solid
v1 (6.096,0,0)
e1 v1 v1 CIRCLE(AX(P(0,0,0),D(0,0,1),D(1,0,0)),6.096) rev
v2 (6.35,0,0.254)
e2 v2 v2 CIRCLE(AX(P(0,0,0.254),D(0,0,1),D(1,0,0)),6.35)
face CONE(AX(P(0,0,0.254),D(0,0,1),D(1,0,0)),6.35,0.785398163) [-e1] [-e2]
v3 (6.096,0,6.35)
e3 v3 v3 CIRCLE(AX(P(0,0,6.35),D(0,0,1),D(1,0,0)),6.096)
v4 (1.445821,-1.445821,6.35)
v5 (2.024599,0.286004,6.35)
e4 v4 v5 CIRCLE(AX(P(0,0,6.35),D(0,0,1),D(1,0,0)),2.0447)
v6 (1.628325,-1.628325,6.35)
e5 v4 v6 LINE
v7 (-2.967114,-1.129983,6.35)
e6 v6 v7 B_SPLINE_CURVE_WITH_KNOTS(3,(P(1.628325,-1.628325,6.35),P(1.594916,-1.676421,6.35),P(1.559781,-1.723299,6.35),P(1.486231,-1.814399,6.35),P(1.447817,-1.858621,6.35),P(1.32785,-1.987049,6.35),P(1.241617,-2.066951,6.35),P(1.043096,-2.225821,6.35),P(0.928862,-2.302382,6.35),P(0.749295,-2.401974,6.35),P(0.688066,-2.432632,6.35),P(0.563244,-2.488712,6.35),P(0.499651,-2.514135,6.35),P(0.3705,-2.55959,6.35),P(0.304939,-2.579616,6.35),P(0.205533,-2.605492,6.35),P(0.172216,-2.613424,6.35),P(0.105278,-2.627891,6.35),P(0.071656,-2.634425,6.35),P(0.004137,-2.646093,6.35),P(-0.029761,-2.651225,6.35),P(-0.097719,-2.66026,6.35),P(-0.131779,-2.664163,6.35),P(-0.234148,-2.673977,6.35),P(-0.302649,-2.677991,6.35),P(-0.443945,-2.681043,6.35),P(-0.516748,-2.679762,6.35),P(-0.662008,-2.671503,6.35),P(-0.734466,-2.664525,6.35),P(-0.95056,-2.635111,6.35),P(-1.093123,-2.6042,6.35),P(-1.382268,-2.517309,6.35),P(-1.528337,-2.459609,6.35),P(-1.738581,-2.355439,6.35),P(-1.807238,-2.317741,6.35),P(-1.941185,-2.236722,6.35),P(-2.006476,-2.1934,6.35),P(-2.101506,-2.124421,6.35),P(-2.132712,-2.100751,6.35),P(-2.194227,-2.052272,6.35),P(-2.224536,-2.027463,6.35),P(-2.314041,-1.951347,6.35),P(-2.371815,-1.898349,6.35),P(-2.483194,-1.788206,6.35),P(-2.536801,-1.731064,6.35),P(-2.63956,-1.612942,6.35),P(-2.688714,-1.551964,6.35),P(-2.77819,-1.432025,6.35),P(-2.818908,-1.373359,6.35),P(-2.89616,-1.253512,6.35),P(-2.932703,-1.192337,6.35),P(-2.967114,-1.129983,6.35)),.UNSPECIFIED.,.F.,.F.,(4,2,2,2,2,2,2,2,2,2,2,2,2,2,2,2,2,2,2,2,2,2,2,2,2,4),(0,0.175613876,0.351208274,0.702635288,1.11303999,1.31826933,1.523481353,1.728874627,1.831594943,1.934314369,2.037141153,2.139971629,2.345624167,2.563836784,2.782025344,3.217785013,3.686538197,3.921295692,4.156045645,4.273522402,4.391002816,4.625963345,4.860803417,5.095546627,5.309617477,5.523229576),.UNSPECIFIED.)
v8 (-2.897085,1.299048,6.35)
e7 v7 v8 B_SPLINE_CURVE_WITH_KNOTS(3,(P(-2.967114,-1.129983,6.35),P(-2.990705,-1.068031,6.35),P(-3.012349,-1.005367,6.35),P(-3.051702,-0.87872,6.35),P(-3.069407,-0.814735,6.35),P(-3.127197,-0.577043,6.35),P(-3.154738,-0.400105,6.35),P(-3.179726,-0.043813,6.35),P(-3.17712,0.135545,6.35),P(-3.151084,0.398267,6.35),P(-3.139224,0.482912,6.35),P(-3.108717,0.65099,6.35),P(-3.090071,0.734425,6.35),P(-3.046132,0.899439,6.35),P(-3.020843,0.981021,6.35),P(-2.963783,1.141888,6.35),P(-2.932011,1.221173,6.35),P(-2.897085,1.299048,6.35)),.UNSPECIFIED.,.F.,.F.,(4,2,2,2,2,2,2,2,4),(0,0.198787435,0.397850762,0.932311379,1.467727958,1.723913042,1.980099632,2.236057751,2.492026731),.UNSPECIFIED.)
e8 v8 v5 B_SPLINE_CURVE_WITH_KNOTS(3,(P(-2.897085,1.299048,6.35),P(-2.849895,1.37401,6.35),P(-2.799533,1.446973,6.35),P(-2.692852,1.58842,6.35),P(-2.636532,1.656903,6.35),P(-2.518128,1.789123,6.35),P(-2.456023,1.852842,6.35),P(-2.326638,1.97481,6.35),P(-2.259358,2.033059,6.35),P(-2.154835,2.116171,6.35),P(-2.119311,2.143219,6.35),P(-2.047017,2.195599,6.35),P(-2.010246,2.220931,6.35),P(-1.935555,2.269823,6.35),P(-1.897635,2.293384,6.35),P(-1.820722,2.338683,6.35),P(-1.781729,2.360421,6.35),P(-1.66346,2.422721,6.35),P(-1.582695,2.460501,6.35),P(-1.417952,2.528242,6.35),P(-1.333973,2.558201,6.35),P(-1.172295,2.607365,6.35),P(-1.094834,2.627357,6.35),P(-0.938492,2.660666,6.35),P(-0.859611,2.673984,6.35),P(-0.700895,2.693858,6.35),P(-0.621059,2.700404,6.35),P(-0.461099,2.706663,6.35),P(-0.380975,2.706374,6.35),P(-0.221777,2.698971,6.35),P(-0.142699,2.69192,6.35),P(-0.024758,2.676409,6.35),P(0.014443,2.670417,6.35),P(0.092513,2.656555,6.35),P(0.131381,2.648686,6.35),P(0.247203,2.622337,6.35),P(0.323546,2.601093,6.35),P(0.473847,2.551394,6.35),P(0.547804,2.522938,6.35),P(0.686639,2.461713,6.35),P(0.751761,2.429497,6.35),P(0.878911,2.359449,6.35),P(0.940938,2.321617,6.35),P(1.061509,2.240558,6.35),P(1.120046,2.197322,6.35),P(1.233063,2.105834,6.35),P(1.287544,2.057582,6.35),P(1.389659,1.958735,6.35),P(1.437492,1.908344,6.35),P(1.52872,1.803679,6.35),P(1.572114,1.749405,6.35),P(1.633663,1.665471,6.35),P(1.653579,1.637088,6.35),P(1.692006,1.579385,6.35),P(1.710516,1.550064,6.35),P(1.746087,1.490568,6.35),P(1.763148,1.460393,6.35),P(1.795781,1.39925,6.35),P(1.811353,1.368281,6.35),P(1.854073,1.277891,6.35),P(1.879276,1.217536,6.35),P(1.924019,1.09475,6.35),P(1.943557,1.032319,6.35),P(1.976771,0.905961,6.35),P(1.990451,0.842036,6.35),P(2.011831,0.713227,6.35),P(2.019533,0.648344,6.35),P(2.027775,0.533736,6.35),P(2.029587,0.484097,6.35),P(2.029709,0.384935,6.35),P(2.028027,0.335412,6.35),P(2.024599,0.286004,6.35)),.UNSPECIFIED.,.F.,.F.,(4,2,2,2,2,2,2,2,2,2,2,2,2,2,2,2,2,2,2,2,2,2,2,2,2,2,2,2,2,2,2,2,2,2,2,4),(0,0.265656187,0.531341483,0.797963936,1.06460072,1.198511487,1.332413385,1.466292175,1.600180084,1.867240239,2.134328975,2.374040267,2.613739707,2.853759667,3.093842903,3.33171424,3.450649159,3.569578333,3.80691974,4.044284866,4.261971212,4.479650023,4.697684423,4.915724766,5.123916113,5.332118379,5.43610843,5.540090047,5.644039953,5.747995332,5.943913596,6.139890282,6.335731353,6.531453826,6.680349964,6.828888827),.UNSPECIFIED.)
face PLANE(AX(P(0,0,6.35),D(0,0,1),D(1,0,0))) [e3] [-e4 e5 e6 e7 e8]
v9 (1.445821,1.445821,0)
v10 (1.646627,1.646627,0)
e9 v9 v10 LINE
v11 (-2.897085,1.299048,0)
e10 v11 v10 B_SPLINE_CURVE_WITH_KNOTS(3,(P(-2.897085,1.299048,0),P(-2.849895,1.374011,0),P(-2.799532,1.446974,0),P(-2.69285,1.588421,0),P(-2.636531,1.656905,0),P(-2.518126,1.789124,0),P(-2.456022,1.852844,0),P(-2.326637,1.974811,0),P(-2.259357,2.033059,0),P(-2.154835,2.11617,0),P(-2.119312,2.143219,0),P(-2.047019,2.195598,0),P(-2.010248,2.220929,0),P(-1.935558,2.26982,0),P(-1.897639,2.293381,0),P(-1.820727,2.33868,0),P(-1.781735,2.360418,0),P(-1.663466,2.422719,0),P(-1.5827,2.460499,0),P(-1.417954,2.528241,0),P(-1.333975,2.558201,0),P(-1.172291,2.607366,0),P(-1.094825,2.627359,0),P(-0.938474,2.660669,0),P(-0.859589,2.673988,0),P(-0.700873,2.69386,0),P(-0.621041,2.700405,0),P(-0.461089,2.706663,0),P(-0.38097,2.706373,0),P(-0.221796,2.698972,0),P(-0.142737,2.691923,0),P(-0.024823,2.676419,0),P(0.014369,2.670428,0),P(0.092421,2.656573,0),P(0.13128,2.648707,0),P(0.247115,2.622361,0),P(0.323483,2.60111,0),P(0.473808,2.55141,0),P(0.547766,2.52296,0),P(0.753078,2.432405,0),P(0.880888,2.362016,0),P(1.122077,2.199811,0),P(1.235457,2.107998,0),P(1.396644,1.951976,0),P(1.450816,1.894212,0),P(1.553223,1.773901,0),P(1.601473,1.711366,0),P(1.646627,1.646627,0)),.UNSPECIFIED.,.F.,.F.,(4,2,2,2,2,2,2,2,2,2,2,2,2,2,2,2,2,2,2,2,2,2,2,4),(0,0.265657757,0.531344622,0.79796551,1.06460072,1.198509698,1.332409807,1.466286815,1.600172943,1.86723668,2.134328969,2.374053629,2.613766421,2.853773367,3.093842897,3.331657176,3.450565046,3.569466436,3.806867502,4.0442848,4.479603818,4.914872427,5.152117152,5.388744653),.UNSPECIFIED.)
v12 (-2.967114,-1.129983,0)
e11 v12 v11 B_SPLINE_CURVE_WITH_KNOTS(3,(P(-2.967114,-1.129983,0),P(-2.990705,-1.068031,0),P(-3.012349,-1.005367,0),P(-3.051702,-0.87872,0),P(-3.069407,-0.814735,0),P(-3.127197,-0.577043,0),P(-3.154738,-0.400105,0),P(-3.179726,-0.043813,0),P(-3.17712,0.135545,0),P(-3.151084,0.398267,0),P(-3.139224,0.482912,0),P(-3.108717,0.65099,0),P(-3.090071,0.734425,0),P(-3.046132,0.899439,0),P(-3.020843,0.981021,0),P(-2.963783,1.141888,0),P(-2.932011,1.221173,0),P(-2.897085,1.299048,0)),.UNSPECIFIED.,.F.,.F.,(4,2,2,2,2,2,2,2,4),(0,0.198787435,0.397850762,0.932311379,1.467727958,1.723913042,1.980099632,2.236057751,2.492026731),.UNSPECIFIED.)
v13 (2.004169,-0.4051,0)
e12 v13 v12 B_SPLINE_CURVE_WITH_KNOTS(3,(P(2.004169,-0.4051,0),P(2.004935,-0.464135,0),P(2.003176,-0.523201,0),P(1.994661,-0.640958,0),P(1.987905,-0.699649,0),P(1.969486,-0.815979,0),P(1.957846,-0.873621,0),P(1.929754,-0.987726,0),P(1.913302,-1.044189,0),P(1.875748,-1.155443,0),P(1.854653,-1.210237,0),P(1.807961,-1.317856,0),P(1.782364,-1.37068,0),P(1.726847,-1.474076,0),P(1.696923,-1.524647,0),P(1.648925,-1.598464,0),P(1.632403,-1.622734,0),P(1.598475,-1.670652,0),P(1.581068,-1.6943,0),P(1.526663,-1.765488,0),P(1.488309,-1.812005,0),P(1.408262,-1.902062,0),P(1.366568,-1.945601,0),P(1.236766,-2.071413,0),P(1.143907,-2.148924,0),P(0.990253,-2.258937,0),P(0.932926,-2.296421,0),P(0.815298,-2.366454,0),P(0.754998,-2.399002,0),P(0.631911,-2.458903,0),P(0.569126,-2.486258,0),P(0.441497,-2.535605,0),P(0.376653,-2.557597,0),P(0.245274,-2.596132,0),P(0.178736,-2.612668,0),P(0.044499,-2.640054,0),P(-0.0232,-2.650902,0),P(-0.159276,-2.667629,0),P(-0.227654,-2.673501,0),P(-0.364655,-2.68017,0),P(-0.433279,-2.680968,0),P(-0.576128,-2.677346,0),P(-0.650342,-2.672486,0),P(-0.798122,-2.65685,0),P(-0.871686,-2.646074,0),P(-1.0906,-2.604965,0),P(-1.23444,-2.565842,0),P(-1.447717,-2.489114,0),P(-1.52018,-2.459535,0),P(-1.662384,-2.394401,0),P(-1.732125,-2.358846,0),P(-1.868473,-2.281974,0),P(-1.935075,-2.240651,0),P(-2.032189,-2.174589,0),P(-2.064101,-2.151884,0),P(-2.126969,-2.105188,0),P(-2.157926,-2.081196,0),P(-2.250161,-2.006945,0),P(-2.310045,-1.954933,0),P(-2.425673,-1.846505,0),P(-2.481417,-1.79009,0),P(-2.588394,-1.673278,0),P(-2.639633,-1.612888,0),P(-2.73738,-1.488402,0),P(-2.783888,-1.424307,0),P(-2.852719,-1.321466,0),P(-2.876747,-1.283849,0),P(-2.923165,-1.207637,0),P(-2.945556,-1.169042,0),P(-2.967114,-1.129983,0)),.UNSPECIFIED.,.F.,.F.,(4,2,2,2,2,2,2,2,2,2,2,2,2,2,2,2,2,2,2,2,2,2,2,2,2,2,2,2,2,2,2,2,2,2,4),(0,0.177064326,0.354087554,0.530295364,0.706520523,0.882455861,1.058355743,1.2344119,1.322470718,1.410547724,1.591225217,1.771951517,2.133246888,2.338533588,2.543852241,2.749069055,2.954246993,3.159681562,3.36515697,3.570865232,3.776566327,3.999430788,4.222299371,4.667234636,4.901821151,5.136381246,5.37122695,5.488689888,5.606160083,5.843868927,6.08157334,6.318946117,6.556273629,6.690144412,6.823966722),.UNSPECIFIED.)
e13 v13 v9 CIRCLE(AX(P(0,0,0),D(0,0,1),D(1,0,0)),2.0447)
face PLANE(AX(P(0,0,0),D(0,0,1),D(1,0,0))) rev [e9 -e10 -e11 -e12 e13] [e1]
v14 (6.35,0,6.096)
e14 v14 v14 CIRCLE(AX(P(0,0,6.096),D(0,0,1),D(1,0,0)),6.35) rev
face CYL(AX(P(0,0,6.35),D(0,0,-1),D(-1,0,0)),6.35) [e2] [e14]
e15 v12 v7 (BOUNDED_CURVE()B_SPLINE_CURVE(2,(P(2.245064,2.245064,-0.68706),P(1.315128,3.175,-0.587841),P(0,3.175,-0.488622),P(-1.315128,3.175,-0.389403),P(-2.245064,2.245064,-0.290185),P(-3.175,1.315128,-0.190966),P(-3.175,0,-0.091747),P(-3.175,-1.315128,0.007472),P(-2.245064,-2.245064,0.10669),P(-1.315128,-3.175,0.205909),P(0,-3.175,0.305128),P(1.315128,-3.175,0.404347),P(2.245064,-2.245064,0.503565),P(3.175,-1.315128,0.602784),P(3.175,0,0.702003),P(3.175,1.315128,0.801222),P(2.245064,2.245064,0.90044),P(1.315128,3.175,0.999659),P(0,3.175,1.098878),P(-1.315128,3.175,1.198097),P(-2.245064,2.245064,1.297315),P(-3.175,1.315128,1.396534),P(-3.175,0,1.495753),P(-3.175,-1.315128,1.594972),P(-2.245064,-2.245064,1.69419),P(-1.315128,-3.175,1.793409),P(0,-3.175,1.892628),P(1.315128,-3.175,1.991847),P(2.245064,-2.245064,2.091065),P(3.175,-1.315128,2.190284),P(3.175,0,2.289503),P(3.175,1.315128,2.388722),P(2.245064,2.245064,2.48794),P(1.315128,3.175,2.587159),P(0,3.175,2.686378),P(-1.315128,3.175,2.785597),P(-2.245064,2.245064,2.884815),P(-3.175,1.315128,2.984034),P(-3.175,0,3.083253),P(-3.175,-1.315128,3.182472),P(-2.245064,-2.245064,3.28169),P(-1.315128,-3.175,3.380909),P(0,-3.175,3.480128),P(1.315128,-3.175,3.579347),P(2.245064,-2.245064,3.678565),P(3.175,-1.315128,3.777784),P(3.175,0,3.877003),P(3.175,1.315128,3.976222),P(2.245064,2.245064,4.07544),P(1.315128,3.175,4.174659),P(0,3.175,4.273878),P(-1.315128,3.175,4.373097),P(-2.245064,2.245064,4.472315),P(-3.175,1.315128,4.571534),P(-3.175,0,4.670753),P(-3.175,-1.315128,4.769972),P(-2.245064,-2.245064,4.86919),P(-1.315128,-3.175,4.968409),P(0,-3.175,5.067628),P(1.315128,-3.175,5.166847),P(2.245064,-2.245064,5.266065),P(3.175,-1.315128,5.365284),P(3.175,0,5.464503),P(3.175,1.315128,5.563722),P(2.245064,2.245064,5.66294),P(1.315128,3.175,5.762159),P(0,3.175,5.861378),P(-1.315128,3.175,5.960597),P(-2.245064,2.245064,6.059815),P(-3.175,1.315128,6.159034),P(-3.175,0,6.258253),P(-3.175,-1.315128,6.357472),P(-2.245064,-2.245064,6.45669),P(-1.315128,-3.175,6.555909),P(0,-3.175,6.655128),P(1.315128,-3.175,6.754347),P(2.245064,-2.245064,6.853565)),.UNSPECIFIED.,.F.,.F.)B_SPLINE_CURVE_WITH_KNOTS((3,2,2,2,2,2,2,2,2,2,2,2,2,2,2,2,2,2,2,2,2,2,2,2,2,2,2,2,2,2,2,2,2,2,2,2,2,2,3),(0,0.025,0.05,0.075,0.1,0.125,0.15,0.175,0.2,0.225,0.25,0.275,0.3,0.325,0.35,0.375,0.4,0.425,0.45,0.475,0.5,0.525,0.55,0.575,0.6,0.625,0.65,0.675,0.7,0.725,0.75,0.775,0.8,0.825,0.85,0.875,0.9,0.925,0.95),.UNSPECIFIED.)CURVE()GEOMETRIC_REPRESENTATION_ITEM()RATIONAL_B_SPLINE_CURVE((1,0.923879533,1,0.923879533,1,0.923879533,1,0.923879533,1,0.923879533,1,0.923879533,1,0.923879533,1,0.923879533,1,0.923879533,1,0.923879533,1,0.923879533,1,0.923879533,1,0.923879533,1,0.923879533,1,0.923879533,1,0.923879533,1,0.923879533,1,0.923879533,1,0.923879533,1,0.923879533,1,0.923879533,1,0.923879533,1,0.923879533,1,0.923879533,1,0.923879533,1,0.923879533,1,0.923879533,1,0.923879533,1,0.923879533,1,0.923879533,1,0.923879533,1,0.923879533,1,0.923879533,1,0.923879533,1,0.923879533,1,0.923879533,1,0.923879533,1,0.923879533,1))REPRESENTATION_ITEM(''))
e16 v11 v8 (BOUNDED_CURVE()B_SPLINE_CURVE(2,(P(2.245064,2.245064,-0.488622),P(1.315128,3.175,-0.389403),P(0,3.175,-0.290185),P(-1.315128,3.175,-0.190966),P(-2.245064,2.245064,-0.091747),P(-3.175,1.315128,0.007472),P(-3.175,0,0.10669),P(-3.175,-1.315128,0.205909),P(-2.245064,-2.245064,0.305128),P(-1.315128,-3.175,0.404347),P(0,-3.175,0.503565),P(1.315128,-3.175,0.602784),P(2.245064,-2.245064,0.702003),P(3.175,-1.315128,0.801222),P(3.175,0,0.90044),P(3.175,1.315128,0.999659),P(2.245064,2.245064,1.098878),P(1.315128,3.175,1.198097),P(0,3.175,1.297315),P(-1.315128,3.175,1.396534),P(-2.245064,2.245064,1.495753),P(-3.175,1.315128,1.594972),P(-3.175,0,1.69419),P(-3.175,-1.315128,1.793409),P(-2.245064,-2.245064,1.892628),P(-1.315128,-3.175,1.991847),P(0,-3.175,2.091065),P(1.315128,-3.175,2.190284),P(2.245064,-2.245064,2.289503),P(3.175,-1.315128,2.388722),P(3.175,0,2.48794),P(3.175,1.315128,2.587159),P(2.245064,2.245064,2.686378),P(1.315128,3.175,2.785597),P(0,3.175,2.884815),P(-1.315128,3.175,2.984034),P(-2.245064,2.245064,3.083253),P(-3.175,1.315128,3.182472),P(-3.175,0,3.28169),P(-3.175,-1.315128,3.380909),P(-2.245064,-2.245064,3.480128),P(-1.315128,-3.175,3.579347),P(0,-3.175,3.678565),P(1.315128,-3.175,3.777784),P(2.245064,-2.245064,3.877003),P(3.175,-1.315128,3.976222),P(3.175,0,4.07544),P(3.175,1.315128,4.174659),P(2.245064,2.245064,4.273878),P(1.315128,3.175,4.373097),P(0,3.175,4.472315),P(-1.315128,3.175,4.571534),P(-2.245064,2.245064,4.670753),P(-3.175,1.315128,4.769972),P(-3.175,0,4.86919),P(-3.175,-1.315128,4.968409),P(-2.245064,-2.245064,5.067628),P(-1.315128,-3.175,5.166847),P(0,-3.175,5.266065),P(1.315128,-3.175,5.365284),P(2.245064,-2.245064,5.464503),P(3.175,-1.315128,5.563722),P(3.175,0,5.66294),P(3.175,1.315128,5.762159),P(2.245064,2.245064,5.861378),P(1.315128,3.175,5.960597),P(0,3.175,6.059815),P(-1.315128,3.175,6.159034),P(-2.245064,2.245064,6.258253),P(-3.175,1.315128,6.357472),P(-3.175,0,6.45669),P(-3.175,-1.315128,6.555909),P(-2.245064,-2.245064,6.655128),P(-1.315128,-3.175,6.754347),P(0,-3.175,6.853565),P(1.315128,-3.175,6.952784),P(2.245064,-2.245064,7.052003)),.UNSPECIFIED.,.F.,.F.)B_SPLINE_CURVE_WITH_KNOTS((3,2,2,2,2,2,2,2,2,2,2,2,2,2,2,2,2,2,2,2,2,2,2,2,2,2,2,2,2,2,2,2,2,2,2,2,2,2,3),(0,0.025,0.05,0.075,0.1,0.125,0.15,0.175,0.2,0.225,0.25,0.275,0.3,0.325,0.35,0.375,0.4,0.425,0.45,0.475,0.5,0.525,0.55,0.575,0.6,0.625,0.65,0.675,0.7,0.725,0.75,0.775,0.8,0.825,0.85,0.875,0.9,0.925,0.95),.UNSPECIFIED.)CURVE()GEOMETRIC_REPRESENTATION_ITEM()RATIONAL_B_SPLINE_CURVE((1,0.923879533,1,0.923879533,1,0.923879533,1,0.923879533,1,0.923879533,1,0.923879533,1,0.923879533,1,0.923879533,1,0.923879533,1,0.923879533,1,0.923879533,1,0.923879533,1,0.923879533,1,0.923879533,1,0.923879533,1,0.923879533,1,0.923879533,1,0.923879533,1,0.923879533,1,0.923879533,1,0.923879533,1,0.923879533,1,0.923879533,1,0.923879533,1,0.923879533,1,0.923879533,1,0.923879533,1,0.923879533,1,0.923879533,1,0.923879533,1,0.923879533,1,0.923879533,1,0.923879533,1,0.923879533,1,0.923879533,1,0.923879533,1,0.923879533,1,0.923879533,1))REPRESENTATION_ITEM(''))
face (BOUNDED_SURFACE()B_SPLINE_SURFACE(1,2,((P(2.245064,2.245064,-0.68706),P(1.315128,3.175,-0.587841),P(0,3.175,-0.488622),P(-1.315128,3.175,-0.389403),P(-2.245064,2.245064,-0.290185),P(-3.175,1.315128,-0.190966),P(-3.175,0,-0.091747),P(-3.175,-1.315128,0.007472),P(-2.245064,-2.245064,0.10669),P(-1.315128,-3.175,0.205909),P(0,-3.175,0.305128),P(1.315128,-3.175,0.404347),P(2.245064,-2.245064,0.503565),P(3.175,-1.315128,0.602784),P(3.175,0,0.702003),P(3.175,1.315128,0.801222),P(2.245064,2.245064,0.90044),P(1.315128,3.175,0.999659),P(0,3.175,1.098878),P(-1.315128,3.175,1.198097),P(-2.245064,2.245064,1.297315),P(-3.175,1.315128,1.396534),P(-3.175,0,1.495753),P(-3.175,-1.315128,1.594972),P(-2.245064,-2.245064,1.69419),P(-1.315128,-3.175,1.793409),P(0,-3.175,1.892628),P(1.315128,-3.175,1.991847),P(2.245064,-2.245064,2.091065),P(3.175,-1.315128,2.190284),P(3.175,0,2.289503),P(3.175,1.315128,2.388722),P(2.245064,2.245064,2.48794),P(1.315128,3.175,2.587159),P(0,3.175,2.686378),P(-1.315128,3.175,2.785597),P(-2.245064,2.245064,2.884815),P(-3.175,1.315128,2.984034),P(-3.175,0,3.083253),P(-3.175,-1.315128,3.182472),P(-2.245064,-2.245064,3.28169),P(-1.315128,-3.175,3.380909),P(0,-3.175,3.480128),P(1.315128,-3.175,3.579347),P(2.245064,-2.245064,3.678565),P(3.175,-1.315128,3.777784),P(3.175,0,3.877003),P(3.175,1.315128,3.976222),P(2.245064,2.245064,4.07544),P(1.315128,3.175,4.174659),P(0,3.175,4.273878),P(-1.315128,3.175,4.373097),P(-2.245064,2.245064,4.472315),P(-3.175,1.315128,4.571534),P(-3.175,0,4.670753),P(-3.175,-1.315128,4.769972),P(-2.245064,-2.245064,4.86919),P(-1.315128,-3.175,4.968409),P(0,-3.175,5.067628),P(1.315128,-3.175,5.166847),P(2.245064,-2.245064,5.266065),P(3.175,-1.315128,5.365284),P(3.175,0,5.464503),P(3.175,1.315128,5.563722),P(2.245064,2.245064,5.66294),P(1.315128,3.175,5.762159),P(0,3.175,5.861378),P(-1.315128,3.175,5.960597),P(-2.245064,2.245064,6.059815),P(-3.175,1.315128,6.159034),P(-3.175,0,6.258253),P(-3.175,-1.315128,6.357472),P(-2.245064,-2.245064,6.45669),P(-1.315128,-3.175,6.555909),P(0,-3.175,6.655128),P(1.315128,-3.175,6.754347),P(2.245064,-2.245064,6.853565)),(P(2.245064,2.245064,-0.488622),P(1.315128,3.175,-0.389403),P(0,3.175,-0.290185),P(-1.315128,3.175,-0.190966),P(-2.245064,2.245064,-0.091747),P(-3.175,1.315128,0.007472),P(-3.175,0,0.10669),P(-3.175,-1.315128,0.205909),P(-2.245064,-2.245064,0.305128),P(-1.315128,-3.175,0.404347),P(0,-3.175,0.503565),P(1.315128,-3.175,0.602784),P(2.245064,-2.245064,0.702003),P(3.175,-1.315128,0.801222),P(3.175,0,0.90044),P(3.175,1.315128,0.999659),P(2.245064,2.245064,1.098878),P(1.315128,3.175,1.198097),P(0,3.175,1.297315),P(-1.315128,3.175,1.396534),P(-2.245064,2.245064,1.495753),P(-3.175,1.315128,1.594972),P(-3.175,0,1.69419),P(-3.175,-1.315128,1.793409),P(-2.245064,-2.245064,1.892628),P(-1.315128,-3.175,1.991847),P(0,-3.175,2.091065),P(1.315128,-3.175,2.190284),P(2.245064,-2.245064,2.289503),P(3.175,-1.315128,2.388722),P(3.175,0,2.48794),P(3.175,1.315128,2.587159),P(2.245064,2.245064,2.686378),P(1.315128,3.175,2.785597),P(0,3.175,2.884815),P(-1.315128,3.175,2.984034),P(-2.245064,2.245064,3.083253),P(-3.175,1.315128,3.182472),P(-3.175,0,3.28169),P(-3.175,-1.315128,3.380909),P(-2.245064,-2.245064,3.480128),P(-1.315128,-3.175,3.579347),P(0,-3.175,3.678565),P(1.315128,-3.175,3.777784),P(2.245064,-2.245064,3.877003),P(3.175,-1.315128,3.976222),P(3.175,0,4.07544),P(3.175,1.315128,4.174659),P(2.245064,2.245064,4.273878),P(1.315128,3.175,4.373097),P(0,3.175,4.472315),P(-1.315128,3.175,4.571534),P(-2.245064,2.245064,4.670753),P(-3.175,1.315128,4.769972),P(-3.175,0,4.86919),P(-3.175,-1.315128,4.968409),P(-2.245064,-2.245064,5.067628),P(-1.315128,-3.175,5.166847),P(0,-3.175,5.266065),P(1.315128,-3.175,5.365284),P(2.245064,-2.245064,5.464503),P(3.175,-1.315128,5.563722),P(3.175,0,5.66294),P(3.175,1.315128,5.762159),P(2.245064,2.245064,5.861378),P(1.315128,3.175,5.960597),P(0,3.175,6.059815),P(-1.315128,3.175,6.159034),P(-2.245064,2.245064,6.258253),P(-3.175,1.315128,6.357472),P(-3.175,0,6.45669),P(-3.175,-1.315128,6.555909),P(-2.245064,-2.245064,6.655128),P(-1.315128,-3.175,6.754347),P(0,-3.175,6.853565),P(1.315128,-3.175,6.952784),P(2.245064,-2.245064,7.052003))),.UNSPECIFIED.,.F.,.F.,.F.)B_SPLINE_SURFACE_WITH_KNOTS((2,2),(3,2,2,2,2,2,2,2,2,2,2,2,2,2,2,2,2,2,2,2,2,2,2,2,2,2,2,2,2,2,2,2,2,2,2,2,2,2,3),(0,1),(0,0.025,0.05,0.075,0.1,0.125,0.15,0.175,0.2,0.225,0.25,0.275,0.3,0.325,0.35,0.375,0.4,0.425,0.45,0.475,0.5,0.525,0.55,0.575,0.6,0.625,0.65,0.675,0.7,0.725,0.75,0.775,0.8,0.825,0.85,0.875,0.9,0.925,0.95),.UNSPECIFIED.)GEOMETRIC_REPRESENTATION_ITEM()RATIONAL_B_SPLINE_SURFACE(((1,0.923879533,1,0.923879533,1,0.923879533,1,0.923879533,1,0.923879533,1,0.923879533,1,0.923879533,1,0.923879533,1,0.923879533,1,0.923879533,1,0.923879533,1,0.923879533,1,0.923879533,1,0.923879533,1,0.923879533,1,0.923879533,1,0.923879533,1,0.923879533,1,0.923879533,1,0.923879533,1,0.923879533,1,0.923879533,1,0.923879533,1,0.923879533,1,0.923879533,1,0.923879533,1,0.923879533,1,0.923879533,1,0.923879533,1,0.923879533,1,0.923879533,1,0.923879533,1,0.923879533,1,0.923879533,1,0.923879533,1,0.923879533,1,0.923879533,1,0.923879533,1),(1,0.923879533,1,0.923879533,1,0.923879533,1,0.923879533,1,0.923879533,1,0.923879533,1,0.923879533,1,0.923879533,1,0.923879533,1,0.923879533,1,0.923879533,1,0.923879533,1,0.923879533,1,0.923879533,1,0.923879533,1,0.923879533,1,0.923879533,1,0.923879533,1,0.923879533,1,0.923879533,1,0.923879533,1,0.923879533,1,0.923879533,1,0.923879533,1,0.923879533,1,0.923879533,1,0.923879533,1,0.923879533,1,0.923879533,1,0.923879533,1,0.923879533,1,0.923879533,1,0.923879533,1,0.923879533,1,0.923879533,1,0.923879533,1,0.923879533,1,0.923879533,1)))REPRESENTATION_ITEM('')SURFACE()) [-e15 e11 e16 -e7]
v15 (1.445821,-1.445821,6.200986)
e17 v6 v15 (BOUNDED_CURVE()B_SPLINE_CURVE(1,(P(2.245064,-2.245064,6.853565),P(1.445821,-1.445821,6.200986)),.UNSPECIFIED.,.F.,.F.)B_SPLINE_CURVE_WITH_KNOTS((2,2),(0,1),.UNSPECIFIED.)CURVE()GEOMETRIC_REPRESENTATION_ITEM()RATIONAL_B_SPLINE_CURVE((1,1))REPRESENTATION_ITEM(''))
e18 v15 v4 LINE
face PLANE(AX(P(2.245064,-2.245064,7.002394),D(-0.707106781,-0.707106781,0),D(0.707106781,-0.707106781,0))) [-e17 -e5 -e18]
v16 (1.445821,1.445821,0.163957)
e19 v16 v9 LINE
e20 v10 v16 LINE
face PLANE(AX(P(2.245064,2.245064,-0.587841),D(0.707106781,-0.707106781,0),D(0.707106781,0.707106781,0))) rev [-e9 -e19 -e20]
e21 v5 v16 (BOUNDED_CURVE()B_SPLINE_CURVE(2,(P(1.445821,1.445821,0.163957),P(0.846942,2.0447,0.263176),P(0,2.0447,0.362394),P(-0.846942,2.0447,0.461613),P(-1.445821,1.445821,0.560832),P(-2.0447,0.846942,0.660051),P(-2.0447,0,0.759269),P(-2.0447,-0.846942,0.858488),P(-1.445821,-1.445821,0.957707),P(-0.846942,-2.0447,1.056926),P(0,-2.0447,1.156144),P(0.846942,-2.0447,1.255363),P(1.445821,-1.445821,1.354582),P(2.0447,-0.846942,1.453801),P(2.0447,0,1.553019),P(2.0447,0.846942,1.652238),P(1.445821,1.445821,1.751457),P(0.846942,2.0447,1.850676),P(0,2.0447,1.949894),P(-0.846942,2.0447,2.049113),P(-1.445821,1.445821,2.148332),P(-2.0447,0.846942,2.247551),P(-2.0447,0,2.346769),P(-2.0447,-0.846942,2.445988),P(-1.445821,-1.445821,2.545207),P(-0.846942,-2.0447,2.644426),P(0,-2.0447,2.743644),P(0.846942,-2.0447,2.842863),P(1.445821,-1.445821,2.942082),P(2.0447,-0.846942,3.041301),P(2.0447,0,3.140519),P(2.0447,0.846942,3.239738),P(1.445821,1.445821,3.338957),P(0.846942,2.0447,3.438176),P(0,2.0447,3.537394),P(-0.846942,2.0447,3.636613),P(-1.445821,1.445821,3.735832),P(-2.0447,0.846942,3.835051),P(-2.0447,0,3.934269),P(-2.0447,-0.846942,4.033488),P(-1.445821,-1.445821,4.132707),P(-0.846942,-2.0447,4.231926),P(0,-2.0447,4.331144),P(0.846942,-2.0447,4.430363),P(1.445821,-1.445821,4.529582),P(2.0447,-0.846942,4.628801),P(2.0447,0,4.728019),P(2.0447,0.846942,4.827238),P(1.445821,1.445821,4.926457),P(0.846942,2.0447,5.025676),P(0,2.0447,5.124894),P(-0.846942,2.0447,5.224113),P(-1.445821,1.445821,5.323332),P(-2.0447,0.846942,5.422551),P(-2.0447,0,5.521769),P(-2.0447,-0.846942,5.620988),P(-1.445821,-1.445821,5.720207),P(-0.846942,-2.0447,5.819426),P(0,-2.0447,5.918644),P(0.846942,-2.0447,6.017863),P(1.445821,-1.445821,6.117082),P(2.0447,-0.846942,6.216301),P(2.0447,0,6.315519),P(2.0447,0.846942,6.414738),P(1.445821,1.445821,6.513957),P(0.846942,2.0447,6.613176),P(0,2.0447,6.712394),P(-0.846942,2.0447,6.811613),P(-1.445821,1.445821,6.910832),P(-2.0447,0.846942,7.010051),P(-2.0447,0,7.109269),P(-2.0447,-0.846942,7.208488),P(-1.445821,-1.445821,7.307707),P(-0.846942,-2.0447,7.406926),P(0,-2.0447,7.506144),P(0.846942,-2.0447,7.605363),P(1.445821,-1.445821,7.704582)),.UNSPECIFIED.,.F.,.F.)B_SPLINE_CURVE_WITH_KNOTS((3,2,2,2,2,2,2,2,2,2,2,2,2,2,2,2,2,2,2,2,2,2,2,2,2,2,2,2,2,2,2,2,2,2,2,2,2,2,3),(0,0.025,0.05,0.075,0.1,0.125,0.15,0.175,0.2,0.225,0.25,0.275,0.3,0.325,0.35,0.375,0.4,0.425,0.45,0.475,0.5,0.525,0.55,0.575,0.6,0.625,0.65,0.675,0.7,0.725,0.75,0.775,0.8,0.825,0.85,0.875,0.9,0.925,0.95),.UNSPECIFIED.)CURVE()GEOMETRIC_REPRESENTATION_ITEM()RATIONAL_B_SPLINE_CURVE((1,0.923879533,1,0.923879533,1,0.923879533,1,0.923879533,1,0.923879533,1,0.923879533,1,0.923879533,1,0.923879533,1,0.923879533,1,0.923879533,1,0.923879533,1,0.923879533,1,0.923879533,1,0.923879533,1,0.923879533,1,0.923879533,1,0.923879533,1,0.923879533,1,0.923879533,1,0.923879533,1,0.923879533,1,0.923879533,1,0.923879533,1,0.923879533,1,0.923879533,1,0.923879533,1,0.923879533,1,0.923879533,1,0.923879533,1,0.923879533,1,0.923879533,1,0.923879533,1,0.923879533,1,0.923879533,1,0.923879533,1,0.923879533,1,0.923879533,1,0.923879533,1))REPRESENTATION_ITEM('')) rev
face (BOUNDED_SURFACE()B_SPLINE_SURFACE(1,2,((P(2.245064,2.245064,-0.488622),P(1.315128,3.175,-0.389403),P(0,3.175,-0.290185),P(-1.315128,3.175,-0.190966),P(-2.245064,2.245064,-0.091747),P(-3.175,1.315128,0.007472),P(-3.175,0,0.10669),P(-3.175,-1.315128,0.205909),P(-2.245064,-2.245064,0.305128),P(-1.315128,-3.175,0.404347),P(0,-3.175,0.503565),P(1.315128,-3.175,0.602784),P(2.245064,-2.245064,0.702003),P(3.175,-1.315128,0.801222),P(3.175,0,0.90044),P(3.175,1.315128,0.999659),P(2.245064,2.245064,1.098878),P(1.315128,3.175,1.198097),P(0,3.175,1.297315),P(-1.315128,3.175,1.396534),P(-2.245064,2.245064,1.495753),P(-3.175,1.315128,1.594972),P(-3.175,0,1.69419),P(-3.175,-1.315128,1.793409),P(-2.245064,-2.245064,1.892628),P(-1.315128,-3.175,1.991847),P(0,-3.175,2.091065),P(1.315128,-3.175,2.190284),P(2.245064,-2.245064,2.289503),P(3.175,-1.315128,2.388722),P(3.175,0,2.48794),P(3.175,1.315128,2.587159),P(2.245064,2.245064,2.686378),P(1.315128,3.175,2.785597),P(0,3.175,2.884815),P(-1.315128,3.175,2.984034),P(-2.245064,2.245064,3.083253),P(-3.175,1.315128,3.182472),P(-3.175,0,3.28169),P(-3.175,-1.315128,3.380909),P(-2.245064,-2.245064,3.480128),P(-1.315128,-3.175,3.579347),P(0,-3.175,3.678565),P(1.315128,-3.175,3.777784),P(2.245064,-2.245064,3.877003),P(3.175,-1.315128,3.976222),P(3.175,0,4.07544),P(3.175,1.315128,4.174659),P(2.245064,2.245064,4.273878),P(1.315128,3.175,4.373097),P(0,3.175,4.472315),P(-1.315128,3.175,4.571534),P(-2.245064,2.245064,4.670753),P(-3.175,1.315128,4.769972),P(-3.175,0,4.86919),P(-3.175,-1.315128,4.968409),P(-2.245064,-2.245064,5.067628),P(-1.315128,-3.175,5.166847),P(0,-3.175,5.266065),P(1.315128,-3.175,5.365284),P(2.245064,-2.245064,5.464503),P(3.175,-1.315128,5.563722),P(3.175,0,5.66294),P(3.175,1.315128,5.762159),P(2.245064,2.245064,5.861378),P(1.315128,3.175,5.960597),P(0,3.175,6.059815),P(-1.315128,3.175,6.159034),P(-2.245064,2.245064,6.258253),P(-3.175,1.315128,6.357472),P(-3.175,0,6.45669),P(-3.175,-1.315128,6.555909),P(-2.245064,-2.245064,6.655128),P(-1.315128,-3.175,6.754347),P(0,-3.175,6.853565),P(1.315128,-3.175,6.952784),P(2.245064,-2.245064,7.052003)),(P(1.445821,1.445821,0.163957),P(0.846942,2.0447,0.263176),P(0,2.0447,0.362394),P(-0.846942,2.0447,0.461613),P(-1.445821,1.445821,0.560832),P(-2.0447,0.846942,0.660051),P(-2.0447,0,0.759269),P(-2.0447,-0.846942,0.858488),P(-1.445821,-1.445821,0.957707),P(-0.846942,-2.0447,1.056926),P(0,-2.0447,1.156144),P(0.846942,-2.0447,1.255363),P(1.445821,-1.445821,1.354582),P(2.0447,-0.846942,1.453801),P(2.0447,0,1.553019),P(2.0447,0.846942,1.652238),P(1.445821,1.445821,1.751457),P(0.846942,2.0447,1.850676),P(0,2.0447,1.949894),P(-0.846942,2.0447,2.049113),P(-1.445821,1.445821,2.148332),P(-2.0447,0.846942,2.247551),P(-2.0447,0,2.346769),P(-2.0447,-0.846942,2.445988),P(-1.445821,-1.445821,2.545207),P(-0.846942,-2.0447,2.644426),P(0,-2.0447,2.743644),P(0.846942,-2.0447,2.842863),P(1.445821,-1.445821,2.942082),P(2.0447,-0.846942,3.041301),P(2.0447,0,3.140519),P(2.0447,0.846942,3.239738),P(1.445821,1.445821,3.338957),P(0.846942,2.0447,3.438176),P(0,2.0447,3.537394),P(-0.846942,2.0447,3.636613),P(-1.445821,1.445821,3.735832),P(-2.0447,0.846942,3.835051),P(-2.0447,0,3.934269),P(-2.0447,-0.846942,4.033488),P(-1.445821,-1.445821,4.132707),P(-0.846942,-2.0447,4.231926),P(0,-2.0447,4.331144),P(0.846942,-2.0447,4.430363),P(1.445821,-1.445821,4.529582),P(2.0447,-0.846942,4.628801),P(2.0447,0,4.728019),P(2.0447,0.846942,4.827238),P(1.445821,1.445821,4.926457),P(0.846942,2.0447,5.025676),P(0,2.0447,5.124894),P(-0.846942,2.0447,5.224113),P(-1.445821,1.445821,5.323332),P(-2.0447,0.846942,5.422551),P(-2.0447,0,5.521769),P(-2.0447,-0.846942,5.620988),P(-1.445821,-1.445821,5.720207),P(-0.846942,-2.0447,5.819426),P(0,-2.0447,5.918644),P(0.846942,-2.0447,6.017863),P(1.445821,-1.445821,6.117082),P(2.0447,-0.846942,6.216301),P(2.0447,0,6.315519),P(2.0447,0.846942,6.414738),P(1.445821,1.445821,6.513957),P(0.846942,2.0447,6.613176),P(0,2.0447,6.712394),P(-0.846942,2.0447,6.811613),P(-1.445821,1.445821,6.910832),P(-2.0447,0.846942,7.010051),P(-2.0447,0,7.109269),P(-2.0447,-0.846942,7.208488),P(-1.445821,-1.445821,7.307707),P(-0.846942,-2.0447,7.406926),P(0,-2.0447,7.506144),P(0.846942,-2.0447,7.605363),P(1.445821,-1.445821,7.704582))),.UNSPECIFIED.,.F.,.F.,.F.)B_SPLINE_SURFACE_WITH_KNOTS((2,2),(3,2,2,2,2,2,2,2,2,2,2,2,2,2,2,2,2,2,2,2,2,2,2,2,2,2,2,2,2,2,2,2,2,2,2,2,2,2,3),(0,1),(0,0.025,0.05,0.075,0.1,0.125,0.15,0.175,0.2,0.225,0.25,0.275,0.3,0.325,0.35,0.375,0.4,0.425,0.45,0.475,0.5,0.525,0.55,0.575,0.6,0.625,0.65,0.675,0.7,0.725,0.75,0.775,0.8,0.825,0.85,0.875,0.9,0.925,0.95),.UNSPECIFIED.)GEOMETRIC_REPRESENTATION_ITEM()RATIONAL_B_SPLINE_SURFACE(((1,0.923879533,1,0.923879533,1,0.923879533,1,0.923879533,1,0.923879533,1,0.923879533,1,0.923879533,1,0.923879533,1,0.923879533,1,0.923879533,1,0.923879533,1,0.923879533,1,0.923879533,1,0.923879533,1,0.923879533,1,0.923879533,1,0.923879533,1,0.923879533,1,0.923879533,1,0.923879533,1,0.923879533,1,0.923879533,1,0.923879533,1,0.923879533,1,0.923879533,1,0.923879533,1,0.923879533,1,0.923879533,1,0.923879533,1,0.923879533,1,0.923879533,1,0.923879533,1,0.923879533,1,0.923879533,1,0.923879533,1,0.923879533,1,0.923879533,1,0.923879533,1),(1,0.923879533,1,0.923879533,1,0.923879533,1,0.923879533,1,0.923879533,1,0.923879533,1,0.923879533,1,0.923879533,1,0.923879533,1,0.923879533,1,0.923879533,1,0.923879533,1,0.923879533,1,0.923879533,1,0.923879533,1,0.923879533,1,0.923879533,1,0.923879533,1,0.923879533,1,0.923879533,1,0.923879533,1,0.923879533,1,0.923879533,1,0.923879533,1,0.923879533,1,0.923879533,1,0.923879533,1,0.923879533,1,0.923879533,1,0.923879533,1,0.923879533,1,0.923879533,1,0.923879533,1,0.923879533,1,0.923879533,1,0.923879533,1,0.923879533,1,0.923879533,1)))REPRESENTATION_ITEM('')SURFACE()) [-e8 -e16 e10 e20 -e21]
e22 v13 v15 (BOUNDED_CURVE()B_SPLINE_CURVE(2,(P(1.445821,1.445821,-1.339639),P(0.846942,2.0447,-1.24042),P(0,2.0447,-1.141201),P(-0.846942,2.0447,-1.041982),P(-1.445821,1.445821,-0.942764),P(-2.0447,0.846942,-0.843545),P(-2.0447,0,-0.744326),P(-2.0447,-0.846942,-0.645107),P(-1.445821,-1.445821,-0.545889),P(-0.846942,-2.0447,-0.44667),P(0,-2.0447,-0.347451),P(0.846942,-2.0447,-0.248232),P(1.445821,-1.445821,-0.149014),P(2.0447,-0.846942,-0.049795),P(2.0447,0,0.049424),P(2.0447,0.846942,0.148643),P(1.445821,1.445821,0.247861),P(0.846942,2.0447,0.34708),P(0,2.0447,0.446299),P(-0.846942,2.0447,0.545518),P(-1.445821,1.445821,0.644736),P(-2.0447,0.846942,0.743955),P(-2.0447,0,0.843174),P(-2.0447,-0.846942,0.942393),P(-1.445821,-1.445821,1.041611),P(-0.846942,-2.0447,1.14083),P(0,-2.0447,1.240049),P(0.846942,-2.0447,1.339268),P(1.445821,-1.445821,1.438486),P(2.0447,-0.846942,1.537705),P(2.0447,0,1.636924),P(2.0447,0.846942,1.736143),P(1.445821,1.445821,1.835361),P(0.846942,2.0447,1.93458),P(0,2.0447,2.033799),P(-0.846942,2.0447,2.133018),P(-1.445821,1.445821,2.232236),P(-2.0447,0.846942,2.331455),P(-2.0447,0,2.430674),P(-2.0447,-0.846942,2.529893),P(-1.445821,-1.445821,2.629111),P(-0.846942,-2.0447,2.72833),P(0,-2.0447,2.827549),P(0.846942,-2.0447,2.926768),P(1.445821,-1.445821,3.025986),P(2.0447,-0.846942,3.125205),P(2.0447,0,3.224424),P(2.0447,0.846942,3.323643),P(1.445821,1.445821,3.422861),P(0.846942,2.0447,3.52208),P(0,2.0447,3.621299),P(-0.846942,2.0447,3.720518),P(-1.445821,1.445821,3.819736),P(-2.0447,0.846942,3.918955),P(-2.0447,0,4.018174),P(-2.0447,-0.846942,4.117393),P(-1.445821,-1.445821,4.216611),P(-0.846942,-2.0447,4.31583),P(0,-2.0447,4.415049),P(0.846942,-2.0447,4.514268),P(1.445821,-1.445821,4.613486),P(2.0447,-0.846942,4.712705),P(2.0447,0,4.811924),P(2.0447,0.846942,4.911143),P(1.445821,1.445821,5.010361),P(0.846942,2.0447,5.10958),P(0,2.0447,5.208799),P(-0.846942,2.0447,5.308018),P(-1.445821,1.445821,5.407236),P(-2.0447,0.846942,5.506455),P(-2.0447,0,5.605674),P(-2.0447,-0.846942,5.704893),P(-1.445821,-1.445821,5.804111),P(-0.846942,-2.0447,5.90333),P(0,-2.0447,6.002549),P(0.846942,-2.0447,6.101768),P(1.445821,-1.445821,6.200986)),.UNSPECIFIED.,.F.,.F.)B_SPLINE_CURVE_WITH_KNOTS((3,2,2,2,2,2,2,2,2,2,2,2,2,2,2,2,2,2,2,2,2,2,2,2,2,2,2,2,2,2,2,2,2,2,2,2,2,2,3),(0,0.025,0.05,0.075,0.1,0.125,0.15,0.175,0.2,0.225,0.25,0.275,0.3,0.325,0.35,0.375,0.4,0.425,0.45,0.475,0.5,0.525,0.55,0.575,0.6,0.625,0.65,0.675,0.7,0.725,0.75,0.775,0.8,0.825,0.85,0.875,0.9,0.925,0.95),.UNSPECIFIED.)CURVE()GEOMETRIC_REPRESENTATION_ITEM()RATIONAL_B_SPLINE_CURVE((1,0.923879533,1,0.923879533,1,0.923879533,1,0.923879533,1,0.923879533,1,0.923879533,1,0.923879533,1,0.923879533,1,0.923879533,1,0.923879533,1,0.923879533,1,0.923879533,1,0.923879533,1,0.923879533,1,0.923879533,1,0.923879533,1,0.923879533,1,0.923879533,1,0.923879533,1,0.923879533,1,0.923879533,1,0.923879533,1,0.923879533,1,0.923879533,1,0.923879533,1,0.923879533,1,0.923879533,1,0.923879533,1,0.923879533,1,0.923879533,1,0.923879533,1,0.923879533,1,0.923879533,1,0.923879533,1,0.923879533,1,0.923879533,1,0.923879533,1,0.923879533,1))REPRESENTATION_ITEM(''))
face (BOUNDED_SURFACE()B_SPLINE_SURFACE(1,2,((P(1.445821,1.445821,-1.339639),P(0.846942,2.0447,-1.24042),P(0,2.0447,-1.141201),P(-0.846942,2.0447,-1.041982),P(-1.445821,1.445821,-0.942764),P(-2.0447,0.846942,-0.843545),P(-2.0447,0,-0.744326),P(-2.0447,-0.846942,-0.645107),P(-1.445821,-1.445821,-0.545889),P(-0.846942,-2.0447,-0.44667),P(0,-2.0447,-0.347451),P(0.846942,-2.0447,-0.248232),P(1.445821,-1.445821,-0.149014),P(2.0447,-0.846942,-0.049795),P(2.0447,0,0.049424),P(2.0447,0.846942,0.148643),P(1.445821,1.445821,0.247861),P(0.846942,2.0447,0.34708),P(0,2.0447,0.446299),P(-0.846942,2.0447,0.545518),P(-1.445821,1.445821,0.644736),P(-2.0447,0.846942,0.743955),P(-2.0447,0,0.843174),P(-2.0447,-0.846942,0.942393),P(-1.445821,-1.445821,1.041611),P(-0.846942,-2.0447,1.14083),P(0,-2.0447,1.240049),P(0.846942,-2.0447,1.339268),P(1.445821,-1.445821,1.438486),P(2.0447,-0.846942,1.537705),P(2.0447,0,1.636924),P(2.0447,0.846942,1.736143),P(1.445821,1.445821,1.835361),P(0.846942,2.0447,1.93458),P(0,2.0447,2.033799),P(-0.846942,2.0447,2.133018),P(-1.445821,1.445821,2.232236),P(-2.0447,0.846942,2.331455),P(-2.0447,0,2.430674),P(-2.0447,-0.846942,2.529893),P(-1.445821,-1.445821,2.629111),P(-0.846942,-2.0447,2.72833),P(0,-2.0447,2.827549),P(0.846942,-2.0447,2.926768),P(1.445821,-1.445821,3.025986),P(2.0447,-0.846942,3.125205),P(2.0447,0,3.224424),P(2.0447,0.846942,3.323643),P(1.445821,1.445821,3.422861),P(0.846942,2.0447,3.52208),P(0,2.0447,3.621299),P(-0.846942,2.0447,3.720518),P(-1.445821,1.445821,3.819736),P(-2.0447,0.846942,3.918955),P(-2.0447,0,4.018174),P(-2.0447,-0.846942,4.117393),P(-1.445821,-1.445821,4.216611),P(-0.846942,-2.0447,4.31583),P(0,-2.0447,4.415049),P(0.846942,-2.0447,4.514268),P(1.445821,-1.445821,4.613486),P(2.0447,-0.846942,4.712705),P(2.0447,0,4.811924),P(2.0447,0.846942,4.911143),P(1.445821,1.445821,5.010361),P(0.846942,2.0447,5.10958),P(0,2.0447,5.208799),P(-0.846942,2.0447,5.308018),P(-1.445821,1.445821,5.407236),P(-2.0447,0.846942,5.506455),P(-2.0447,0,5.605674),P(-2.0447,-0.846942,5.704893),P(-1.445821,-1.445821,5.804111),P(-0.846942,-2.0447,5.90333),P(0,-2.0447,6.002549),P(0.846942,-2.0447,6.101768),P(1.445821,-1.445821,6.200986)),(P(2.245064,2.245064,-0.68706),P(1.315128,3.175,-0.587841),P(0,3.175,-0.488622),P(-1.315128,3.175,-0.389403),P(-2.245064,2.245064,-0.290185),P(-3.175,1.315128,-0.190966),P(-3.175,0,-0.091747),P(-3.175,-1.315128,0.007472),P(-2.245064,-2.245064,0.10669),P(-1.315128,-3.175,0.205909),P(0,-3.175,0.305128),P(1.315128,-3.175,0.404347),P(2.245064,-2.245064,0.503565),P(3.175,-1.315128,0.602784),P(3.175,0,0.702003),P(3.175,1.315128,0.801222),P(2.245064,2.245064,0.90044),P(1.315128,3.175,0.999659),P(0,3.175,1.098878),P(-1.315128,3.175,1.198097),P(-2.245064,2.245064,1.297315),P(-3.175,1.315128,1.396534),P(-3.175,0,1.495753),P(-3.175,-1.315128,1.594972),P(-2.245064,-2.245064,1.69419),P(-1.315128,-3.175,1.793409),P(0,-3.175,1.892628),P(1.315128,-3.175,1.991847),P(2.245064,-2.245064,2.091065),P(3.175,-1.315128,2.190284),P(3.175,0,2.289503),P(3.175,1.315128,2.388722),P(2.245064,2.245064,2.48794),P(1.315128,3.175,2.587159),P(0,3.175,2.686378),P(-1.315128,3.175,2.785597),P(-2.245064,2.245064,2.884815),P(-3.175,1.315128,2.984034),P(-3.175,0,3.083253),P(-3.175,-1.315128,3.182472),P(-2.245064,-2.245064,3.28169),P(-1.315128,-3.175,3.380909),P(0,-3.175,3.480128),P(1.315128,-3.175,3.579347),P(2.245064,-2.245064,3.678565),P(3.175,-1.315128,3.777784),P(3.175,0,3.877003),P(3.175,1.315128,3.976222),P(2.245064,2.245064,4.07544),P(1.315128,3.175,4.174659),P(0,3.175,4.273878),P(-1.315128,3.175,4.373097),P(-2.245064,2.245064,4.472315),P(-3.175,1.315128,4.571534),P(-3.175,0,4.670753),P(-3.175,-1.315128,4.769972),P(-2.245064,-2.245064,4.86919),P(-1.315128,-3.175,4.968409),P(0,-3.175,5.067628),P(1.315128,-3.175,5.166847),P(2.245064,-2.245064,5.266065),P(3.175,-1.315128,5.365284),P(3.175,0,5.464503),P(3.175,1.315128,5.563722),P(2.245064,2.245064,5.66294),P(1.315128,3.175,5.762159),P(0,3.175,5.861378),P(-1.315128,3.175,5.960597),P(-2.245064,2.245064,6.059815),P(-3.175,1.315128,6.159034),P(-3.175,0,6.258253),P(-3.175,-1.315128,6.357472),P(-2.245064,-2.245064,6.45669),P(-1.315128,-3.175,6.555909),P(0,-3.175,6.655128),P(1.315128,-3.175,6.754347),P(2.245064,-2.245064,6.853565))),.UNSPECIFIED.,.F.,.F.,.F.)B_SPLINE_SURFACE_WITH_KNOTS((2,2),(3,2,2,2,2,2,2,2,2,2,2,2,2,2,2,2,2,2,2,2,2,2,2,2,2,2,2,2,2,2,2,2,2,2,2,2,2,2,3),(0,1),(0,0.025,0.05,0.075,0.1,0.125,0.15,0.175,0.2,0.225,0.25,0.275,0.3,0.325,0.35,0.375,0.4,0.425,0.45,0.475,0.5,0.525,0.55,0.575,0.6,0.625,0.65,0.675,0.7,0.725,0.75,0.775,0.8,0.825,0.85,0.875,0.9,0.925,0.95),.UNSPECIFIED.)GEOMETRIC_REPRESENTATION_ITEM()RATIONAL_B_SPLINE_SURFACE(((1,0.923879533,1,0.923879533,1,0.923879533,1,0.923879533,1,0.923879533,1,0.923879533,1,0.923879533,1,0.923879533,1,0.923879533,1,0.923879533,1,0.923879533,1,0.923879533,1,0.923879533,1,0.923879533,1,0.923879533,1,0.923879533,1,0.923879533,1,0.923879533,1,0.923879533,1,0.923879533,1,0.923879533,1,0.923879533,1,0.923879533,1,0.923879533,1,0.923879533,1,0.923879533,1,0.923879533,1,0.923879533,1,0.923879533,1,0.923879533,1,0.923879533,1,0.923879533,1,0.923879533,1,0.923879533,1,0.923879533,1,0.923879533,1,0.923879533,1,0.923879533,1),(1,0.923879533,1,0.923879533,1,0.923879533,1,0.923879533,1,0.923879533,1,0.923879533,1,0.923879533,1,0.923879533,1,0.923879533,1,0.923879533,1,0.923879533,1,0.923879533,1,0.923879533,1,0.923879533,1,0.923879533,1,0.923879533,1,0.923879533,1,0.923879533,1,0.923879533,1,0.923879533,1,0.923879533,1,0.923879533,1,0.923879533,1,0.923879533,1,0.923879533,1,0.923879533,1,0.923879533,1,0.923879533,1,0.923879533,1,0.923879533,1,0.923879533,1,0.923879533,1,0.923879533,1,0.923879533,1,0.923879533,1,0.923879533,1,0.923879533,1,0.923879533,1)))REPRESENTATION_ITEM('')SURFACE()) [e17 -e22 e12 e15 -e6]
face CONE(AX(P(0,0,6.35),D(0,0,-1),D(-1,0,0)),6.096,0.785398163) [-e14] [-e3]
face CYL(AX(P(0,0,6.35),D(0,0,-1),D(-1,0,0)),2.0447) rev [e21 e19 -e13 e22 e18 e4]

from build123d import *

# Parameters (mm, degrees)
SKETCH1_R           = 6.35
SKETCH1_R_2         = 2.0447
BOSS_EXTRUDE1_DEPTH = 6.35
CUT_SWEEP1_PITCH    = 1.5875
CHAMFER1_SIZE       = 0.254


with BuildPart() as part:
    # Sketch1 → Boss-Extrude1 (new body)
    with BuildSketch(Plane.XY):
        Circle(SKETCH1_R)
        Circle(SKETCH1_R_2, mode=Mode.SUBTRACT)
    extrude(amount=BOSS_EXTRUDE1_DEPTH)

    # Cut-Sweep1: arcs per turn and ends read off the stored shape
    # Cut-Sweep1: the profile of Sketch2 profile screwed along a right-hand helix through 4.75 turns, 8 arcs to a turn; built about Z, then put on its axis
    cut_sweep1_z = Axis((0, 0, 0), (0, 0, 1))
    cut_sweep1_corners = [(2.0444, 0, -1.339811764), (3.175, 0, -0.68705955), (3.175, 0, -0.48862205), (2.0444, 0, 0.164130164)]
    with BuildLine(mode=Mode.PRIVATE) as cut_sweep1_profile:
        Line(cut_sweep1_corners[0], cut_sweep1_corners[1])
        Line(cut_sweep1_corners[1], cut_sweep1_corners[2])
        Line(cut_sweep1_corners[2], cut_sweep1_corners[3])
        Line(cut_sweep1_corners[3], cut_sweep1_corners[0])
    cut_sweep1_cap = Face(cut_sweep1_profile.wire())
    cut_sweep1_turn_angles = [0, 22.5, 45, 67.5, 90, 112.5, 135, 157.5, 180, 202.5, 225, 247.5, 270, 292.5, 315, 337.5, 360]
    cut_sweep1_turn_weights = [1, 0.9238795325112867, 1, 0.9238795325112867, 1, 0.9238795325112867, 1, 0.9238795325112867, 1, 0.9238795325112867, 1, 0.9238795325112867, 1, 0.9238795325112867, 1, 0.9238795325112867, 1]
    cut_sweep1_turn_rails = [Edge.make_bspline([Vector(p[0], p[1], 0).rotate(cut_sweep1_z, cut_sweep1_turn_angles[k]) / cut_sweep1_turn_weights[k] + Vector(0, 0, p[2] + CUT_SWEEP1_PITCH * cut_sweep1_turn_angles[k] / 360) for k in range(17)], [0, 0, 0, 1, 1, 2, 2, 3, 3, 4, 4, 5, 5, 6, 6, 7, 7, 8, 8, 8], 2, cut_sweep1_turn_weights) for p in cut_sweep1_corners]
    cut_sweep1_turn_sides = [Face.make_surface_from_curves(cut_sweep1_turn_rails[p[0]], cut_sweep1_turn_rails[p[1]]) for p in [(0, 1), (1, 2), (2, 3), (3, 0)]]
    cut_sweep1_last_angles = [1440, 1462.5, 1485, 1507.5, 1530, 1552.5, 1575, 1597.5, 1620, 1642.5, 1665, 1687.5, 1710]
    cut_sweep1_last_weights = [1, 0.9238795325112867, 1, 0.9238795325112867, 1, 0.9238795325112867, 1, 0.9238795325112867, 1, 0.9238795325112867, 1, 0.9238795325112769, 1]
    cut_sweep1_last_rails = [Edge.make_bspline([Vector(p[0], p[1], 0).rotate(cut_sweep1_z, cut_sweep1_last_angles[k]) / cut_sweep1_last_weights[k] + Vector(0, 0, p[2] + CUT_SWEEP1_PITCH * cut_sweep1_last_angles[k] / 360) for k in range(13)], [0, 0, 0, 1, 1, 2, 2, 3, 3, 4, 4, 5, 5, 6, 6, 6], 2, cut_sweep1_last_weights) for p in cut_sweep1_corners]
    cut_sweep1_last_sides = [Face.make_surface_from_curves(cut_sweep1_last_rails[p[0]], cut_sweep1_last_rails[p[1]]) for p in [(0, 1), (1, 2), (2, 3), (3, 0)]]
    cut_sweep1 = Plane(origin=(0, 0, 0), x_dir=(0.7071067811865512, 0.7071067811865438, 0), z_dir=(0, 0, 1)) * Solid(Shell([*[p.moved(Location((0, 0, CUT_SWEEP1_PITCH * i))) for i in range(4) for p in cut_sweep1_turn_sides], *cut_sweep1_last_sides, cut_sweep1_cap, cut_sweep1_cap.rotate(cut_sweep1_z, 1710).moved(Location((0, 0, CUT_SWEEP1_PITCH * 1710 / 360)))]))
    add(cut_sweep1, mode=Mode.SUBTRACT)

    # Chamfer1
    chamfer1_edges = [part.edges().sort_by_distance(p)[0] for p in [
        (-6.35, 0, 0),
        (-6.35, 0, 6.35),
    ]]
    chamfer(chamfer1_edges, length=CHAMFER1_SIZE)


solid = part.part
